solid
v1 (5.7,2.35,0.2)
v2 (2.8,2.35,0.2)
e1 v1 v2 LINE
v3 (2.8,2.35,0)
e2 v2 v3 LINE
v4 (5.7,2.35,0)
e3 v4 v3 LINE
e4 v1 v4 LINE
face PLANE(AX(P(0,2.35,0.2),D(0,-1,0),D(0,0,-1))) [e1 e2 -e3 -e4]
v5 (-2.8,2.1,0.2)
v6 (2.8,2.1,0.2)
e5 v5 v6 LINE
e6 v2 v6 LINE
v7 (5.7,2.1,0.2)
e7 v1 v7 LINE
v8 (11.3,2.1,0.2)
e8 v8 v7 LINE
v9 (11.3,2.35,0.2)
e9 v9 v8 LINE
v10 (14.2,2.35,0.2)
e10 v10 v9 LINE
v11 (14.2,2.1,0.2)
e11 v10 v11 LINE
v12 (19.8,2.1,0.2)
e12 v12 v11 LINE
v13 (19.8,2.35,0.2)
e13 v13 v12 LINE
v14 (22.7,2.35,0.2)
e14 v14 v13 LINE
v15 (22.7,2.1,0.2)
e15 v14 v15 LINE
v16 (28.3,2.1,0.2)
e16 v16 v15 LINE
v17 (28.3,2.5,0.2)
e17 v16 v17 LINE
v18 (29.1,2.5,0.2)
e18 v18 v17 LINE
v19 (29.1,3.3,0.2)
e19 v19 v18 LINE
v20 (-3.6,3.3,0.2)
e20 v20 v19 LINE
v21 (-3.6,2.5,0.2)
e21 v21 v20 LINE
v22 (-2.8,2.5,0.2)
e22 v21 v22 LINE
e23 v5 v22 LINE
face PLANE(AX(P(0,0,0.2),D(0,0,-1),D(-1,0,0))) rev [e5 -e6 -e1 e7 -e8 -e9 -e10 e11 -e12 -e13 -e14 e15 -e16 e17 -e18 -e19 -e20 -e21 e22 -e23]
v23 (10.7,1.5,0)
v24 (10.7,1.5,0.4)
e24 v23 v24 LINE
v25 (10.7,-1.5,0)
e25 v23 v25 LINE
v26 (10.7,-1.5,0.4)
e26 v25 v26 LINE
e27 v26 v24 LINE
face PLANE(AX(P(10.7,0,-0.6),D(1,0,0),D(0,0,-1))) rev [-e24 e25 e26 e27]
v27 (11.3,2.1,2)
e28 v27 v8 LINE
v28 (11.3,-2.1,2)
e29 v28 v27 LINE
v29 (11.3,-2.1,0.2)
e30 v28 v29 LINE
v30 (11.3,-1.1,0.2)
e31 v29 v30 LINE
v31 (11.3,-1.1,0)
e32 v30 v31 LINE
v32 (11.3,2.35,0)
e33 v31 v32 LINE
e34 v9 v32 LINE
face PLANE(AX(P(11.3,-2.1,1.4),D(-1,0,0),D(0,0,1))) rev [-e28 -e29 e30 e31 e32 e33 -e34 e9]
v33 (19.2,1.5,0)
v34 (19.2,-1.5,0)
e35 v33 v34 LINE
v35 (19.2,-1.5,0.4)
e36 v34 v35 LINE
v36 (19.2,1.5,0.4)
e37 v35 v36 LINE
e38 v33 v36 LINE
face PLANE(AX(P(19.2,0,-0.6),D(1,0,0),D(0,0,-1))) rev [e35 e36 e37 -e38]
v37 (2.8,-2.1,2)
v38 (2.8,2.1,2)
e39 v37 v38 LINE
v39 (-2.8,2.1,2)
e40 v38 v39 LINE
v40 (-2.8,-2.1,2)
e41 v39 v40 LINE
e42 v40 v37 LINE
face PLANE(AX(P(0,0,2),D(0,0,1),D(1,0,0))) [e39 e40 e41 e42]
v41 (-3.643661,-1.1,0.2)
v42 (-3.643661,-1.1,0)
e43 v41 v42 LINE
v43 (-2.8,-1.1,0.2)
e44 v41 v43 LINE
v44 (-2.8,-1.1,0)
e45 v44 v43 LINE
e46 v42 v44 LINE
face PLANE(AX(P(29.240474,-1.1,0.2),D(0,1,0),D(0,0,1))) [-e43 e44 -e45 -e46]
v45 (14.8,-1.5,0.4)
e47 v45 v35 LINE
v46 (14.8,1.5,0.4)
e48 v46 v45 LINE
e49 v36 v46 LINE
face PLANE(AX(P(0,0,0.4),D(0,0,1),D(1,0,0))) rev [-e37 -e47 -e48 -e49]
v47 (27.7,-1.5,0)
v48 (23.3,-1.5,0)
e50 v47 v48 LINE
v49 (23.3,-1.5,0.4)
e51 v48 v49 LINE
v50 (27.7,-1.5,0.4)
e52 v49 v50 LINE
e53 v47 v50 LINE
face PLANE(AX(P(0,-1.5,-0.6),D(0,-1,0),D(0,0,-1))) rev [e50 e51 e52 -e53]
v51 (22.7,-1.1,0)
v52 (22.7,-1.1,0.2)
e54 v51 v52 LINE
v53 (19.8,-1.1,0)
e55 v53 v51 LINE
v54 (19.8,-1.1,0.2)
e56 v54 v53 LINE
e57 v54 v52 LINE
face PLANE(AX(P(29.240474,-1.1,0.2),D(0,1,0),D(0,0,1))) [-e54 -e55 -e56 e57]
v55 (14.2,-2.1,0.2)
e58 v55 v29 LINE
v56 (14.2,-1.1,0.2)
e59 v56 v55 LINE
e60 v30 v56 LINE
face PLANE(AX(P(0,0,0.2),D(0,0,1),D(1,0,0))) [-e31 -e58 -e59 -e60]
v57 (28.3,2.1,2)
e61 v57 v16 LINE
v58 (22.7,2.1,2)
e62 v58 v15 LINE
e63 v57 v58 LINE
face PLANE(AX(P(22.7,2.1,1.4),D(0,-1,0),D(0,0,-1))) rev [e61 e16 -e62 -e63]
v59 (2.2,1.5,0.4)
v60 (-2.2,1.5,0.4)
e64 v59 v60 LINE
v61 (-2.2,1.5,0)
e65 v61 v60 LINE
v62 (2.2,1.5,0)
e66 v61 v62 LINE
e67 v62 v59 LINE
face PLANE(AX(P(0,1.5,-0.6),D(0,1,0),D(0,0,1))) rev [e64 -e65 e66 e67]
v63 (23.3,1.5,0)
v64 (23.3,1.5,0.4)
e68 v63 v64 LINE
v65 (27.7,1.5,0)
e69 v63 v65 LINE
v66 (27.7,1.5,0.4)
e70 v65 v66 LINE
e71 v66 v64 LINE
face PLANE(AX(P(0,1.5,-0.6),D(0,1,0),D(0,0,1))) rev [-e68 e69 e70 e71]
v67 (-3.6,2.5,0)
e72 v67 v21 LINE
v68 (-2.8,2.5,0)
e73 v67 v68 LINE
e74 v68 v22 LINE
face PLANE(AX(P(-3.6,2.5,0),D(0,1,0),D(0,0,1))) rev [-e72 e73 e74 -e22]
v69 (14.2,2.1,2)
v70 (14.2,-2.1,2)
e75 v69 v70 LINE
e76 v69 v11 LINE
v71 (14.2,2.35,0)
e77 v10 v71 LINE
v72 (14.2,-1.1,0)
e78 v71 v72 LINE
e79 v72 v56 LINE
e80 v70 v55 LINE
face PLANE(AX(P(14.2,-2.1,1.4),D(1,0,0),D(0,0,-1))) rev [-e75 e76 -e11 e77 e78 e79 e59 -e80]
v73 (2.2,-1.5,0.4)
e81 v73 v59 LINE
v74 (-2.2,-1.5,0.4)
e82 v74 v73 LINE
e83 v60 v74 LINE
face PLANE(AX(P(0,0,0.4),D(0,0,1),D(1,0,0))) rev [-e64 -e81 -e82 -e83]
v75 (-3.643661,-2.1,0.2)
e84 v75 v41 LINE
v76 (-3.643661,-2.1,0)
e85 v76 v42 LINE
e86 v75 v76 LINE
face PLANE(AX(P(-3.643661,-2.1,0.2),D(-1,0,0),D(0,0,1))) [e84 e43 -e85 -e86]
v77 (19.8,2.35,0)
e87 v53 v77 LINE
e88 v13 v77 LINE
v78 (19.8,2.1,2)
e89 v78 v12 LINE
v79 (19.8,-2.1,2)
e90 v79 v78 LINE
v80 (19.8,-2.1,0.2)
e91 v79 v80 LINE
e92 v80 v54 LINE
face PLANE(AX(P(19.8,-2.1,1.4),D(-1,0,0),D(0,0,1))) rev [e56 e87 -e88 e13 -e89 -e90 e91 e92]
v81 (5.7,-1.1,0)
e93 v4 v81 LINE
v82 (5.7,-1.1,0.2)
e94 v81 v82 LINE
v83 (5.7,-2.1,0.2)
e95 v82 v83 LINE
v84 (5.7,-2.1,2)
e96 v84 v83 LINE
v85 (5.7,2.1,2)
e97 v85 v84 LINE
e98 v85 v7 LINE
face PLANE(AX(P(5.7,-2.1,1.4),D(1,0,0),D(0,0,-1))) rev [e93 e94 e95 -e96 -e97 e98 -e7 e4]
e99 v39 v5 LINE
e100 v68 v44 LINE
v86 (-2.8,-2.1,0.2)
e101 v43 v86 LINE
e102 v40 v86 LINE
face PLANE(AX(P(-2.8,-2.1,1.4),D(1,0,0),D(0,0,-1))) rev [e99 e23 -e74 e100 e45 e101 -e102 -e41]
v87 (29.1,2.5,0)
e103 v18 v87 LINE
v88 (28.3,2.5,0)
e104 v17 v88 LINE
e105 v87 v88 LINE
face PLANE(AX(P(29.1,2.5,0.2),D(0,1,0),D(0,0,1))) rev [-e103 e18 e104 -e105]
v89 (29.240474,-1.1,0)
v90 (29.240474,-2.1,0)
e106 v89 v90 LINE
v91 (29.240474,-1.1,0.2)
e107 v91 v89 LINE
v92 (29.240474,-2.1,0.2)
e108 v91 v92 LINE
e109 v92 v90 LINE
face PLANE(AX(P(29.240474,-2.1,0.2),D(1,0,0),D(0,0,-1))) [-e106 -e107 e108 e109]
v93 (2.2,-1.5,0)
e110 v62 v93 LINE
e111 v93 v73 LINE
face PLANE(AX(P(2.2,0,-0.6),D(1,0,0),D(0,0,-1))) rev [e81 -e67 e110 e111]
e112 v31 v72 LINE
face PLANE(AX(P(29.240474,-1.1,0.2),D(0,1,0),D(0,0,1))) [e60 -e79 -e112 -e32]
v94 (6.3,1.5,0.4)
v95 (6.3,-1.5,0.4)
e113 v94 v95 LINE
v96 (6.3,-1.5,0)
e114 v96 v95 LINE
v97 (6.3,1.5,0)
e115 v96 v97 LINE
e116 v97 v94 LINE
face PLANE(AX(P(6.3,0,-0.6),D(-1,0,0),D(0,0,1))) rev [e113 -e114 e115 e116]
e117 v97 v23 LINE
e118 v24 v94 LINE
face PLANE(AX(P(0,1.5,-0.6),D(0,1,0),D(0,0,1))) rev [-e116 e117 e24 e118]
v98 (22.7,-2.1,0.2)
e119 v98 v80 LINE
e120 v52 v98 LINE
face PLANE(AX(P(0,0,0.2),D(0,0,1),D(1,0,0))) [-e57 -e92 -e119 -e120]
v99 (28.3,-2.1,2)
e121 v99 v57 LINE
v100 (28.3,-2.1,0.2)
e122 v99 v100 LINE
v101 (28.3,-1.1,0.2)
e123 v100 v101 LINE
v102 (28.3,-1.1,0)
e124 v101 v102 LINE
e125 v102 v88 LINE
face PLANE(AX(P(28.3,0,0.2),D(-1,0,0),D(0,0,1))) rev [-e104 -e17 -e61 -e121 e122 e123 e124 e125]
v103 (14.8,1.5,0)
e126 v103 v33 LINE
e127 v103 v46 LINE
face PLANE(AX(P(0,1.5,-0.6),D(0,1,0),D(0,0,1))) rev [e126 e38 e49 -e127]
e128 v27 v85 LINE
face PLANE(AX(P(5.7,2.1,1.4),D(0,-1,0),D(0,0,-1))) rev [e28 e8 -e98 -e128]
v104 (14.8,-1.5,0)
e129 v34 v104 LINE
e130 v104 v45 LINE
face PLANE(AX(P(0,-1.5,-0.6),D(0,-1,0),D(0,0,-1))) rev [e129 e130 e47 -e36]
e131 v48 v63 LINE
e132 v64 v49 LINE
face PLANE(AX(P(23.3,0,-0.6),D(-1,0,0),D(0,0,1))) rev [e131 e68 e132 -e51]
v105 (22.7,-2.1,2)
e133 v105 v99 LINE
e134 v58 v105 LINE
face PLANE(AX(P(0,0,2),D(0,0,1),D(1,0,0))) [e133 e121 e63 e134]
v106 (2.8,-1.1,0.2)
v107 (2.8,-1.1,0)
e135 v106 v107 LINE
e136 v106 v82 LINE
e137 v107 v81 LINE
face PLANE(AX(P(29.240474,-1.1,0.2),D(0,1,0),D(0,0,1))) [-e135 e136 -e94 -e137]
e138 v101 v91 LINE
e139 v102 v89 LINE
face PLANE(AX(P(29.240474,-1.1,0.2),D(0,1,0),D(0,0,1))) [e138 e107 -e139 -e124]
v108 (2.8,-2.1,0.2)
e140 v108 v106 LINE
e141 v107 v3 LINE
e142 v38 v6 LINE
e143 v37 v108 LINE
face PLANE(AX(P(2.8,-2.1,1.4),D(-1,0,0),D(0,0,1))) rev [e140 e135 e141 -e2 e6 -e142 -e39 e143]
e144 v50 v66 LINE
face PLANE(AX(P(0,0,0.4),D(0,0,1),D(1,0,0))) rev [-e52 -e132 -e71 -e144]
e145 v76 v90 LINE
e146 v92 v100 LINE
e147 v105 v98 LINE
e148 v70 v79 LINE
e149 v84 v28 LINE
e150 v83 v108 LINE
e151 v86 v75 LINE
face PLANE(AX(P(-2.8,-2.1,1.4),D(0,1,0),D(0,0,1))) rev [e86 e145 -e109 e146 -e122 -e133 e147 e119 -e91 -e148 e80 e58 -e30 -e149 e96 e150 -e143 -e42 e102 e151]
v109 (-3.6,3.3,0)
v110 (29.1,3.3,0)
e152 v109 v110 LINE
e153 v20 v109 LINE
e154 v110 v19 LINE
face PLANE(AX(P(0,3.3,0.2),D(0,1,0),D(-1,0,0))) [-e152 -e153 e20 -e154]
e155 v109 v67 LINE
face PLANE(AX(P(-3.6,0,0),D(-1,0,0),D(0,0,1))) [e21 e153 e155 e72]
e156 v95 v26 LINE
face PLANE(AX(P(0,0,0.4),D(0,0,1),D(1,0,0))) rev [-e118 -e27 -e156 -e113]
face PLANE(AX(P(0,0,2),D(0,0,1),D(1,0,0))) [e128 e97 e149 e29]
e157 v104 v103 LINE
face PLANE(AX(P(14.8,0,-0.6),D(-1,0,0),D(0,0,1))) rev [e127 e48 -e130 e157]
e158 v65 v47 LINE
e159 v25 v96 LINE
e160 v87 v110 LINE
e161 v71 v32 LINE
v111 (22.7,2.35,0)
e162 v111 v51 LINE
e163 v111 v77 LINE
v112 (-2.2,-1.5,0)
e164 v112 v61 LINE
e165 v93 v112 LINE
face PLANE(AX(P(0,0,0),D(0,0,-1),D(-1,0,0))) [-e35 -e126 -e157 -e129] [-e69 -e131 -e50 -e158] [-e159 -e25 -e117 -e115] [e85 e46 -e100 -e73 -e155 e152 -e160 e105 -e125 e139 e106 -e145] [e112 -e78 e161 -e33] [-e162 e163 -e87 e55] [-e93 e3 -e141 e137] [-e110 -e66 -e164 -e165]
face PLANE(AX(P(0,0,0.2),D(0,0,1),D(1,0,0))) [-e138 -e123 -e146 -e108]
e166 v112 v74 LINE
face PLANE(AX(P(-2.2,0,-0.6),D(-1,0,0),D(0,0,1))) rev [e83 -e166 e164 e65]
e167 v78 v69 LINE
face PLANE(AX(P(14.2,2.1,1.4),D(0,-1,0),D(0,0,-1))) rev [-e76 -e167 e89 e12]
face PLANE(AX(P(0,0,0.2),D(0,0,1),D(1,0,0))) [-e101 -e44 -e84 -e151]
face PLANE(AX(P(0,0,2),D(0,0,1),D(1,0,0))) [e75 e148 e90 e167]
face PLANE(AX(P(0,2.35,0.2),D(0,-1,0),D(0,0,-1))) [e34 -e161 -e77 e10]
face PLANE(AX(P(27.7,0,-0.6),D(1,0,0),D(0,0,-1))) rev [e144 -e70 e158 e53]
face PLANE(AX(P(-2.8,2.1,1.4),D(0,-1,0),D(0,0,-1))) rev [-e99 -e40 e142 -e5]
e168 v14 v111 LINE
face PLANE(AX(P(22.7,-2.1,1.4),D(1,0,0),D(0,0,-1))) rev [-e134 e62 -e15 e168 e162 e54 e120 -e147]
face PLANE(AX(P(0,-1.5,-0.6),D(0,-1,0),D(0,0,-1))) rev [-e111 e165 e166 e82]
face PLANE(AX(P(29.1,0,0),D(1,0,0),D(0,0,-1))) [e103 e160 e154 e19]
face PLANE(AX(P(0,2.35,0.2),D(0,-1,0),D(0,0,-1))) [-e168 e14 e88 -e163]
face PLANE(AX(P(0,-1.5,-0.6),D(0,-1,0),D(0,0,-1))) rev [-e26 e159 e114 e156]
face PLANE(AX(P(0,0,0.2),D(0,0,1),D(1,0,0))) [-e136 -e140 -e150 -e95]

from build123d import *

# Parameters (mm, degrees)
SKETCH_1_W             = 5.6
SKETCH_1_H             = 4.2
EXTRUDE_1_DEPTH        = 1.4
SKETCH_3_W             = 31.1
SKETCH_3_H             = 1.5
EXTRUDE_2_DEPTH        = 0.2
PATTERN_LINEAR_1_COUNT = 4
PATTERN_LINEAR_1_PITCH = 8.5
SKETCH_4_W             = 2.9
SKETCH_4_H             = 1.1
CUT_EXTRUDE_1_DEPTH    = 0.2
SKETCH_5_W             = 0.2
SKETCH_5_H             = 0.8
EXTRUDE_3_DEPTH        = 0.8
SKETCH_6_W             = 0.2
SKETCH_6_H             = 0.8
EXTRUDE_4_DEPTH        = 0.8
SKETCH_7_W             = 32.884134448
SKETCH_7_H             = 1
EXTRUDE_5_DEPTH        = 0.2
CUT_EXTRUDE_START      = -1
SKETCH_8_W             = 4.4
SKETCH_8_H             = 3
CUT_EXTRUDE_2_DEPTH    = 1
SKETCH_9_W             = 5.6
SKETCH_9_H             = 4.2
EXTRUDE_6_DEPTH        = 0.6


with BuildPart() as part:
    # Эскиз1 → Бобышка-Вытянуть1 (new body)
    with BuildSketch(Plane.XY):
        Rectangle(SKETCH_1_W, SKETCH_1_H)
    extrude_1 = extrude(amount=EXTRUDE_1_DEPTH)

    # Эскиз3 → Бобышка-Вытянуть2 (add)
    with BuildSketch(Plane(origin=(0, 0, 0), x_dir=(-1, 0, 0), z_dir=(0, 0, -1))):
        with Locations((-12.75, 2.55)):
            Rectangle(SKETCH_3_W, SKETCH_3_H)
    extrude(amount=-EXTRUDE_2_DEPTH)

    # Линейный массив1: Бобышка-Вытянуть1 ×4
    with Locations(*[(i * PATTERN_LINEAR_1_PITCH, 0, 0) for i in range(1, PATTERN_LINEAR_1_COUNT)]):
        add(extrude_1)

    # Эскиз4 → Вырез-Вытянуть1 (cut)
    with BuildSketch(Plane(origin=(0, 0, 0), x_dir=(-1, 0, 0), z_dir=(0, 0, -1))):
        with Locations((-21.25, 1.8)):
            Rectangle(SKETCH_4_W, SKETCH_4_H)
        with Locations((-12.75, 1.8)):
            Rectangle(SKETCH_4_W, SKETCH_4_H)
        with Locations((-4.25, 1.8)):
            Rectangle(SKETCH_4_W, SKETCH_4_H)
    extrude(amount=-CUT_EXTRUDE_1_DEPTH, mode=Mode.SUBTRACT)

    # Эскиз5 → Бобышка-Вытянуть3 (add)
    with BuildSketch(Plane(origin=(28.3, 0, 0), x_dir=(0, 0, -1), z_dir=(1, 0, 0))):
        with Locations((-0.1, 2.9)):
            Rectangle(SKETCH_5_W, SKETCH_5_H)
    extrude(amount=EXTRUDE_3_DEPTH)

    # Эскиз6 → Бобышка-Вытянуть4 (add)
    with BuildSketch(Plane.ZY.offset(2.8)):
        with Locations((0.1, 2.9)):
            Rectangle(SKETCH_6_W, SKETCH_6_H)
    extrude(amount=EXTRUDE_4_DEPTH)

    # Эскиз7 → Бобышка-Вытянуть5 (add)
    with BuildSketch(Plane(origin=(0, 0, 0), x_dir=(-1, 0, 0), z_dir=(0, 0, -1))):
        with Locations((-12.798406479, -1.6)):
            Rectangle(SKETCH_7_W, SKETCH_7_H)
    extrude(amount=-EXTRUDE_5_DEPTH)

    # Эскиз8 → Вырез-Вытянуть2 (cut)
    with BuildSketch(Plane.XY.offset(1.4).offset(CUT_EXTRUDE_START)):
        Rectangle(SKETCH_8_W, SKETCH_8_H)
        with Locations((8.5, 0)):
            Rectangle(SKETCH_8_W, SKETCH_8_H)
        with Locations((17, 0)):
            Rectangle(SKETCH_8_W, SKETCH_8_H)
        with Locations((25.5, 0)):
            Rectangle(SKETCH_8_W, SKETCH_8_H)
    extrude(amount=-CUT_EXTRUDE_2_DEPTH, mode=Mode.SUBTRACT)

    # Эскиз9 → Бобышка-Вытянуть6 (add)
    with BuildSketch(Plane.XY.offset(1.4)):
        Rectangle(SKETCH_9_W, SKETCH_9_H)
        with Locations((8.5, 0)):
            Rectangle(SKETCH_9_W, SKETCH_9_H)
        with Locations((17, 0)):
            Rectangle(SKETCH_9_W, SKETCH_9_H)
        with Locations((25.5, 0)):
            Rectangle(SKETCH_9_W, SKETCH_9_H)
    extrude(amount=EXTRUDE_6_DEPTH)


solid = part.part
